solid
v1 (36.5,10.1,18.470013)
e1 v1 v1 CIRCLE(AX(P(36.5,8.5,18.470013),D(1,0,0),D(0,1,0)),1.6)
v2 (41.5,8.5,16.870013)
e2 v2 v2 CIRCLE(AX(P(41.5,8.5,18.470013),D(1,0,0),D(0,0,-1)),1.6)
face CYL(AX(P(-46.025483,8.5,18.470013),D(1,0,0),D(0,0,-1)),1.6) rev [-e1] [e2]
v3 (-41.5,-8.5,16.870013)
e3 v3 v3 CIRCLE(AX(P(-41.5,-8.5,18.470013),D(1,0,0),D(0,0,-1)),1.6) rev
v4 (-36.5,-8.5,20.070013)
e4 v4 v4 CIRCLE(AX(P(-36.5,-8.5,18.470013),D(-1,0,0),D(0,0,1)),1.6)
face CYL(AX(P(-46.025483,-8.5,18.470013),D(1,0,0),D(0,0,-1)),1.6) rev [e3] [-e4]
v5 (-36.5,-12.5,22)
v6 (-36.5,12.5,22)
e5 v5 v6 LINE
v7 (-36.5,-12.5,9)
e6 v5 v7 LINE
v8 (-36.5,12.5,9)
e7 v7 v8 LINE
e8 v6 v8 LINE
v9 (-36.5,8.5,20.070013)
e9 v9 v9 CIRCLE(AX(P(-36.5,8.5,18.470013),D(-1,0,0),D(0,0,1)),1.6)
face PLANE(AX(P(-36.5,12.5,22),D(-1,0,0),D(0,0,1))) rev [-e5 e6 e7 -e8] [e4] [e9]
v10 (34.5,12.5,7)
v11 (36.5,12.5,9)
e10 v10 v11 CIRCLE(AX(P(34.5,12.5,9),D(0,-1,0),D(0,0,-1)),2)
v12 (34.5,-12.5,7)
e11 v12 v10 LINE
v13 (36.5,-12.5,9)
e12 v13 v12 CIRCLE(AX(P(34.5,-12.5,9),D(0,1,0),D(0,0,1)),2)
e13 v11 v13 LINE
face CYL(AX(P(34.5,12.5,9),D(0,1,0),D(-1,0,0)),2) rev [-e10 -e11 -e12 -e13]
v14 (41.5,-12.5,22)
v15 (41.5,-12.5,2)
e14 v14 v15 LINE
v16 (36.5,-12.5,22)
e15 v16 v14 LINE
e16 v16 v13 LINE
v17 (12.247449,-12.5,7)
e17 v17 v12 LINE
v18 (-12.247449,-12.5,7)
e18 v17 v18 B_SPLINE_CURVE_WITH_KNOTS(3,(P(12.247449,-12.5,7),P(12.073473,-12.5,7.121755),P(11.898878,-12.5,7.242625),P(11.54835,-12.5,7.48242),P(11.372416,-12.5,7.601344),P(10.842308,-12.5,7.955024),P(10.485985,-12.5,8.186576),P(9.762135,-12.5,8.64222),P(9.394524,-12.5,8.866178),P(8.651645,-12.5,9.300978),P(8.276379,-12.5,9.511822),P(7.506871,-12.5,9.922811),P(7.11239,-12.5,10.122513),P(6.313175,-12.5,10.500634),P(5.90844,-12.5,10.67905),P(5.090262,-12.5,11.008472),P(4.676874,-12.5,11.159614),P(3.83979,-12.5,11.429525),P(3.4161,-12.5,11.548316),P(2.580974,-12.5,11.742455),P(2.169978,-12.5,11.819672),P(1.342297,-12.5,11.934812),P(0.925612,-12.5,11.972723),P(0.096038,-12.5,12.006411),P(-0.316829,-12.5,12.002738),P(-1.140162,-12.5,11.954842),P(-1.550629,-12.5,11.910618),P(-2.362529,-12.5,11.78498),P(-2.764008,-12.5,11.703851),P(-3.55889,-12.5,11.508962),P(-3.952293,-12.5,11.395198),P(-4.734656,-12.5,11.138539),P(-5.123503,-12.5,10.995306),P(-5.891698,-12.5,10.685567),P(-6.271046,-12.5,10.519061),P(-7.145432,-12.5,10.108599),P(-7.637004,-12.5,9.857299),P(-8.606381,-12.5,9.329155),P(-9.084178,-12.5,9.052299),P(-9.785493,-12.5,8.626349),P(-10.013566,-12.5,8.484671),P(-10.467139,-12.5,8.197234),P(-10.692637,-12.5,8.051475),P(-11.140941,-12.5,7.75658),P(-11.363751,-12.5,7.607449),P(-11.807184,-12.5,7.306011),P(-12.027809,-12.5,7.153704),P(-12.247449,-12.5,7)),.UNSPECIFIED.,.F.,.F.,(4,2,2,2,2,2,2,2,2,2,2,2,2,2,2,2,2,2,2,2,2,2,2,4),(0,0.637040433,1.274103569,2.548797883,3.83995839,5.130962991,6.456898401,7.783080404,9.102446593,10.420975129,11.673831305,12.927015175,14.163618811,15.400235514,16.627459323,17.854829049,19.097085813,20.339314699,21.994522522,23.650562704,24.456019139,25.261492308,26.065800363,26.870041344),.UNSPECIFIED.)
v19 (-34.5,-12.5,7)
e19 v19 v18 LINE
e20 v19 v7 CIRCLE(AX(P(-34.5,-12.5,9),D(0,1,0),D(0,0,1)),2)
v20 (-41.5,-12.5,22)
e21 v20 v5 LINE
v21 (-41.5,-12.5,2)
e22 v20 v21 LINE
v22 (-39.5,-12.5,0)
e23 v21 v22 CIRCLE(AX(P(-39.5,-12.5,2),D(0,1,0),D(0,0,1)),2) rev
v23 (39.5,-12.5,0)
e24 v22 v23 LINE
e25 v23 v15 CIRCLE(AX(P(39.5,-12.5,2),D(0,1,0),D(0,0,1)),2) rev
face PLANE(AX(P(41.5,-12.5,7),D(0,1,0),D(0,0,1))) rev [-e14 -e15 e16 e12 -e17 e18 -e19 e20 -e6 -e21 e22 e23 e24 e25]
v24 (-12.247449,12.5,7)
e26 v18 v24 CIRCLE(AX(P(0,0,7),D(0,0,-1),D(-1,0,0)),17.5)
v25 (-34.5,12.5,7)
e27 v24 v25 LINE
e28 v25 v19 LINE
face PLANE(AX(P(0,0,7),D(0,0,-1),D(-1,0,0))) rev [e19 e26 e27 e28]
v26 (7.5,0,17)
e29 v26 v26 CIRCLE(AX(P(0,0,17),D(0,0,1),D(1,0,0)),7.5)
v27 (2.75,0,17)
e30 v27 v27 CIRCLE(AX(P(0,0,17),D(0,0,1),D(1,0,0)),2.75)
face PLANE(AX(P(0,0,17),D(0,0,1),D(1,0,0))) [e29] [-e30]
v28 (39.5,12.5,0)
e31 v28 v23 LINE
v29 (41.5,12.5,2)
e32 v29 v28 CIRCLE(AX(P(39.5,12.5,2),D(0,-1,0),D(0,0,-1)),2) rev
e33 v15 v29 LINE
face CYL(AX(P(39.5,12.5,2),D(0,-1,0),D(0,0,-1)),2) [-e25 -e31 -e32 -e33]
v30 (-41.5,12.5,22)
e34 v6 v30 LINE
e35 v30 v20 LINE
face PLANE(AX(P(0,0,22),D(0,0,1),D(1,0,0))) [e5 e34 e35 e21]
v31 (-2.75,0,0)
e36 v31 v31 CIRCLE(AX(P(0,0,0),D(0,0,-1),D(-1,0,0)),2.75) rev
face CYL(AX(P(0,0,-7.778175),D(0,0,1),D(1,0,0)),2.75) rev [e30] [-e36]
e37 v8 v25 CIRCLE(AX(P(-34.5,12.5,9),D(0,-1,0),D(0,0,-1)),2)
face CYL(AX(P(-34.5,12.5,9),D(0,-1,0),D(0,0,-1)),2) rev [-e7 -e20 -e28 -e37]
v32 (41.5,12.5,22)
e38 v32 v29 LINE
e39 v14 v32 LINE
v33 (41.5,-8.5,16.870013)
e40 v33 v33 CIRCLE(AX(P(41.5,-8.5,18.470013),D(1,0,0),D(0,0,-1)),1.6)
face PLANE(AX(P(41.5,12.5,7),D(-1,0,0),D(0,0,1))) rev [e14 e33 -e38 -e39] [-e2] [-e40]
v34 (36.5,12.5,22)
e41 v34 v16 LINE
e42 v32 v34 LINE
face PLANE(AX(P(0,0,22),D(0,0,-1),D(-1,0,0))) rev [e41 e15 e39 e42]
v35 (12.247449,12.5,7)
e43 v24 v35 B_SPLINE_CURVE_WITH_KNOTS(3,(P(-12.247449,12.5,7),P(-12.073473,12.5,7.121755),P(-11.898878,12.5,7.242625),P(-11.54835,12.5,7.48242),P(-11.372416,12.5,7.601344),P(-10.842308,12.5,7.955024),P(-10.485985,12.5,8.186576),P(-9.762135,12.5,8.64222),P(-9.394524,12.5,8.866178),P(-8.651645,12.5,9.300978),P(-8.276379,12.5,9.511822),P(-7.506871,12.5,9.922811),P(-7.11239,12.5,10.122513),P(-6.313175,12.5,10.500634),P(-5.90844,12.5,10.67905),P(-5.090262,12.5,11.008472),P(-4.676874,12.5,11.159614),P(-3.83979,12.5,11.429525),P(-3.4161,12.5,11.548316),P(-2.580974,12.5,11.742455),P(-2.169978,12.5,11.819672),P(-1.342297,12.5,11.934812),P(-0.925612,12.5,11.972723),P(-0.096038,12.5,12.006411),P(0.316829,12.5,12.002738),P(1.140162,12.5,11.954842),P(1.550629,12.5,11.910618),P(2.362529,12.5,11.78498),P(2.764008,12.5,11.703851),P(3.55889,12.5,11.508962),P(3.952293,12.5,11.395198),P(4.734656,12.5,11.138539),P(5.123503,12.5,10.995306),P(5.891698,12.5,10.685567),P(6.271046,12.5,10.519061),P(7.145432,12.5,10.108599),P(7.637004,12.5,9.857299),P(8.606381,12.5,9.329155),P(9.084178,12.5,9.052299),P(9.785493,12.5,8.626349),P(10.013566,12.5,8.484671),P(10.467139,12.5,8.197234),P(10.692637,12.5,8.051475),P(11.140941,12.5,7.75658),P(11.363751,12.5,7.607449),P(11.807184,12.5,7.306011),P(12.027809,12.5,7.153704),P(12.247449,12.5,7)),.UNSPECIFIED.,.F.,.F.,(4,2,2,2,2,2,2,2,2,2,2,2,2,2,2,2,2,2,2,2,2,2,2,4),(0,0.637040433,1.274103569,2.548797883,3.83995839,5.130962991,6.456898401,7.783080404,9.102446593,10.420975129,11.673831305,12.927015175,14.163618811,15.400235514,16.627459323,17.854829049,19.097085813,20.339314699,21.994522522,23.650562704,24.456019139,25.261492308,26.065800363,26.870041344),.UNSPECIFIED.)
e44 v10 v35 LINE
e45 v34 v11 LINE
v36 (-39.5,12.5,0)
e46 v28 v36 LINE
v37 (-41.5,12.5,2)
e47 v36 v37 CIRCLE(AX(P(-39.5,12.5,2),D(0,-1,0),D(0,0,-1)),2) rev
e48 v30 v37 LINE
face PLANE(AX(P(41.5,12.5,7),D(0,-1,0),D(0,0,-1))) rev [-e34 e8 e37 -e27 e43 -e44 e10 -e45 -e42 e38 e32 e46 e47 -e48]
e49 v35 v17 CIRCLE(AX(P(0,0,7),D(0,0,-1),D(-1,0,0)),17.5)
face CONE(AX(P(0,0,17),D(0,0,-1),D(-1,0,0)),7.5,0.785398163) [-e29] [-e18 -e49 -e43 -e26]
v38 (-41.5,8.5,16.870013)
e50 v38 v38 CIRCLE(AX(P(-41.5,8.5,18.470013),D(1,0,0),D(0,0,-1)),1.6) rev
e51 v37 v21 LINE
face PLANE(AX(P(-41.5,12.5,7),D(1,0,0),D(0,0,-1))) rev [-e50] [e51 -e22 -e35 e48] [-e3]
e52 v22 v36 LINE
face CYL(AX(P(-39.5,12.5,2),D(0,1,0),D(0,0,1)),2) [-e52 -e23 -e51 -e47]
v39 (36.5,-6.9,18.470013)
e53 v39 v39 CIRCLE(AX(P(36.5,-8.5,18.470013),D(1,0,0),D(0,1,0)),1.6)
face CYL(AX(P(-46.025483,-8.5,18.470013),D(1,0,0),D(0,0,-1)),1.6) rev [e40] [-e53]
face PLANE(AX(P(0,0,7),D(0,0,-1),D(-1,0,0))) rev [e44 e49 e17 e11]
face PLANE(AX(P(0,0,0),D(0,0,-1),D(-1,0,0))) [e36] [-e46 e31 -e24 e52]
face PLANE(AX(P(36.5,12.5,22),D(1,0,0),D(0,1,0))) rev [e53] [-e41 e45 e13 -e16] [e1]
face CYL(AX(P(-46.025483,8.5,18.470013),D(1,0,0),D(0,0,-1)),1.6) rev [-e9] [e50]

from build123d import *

# Parameters (mm, degrees)
SZKIC1_W                    = 83
SZKIC1_H                    = 25
DODANIE_WYCI_GNI_CIE1_DEPTH = 7
SZKIC2_W                    = 5
SZKIC2_H                    = 25
DODANIE_WYCI_GNI_CIE2_DEPTH = 15
WYTNIJ_WYCI_GNI_CIE1_REACH  = 88.771
SZKIC3_R                    = 1.6
SZKIC4_R                    = 7.5
DODANIE_WYCI_GNI_CIE4_DEPTH = 10
SZKIC5_R                    = 2.75
WYTNIJ_WYCI_GNI_CIE2_DEPTH  = 17
SFAZOWANIE1_SIZE            = 10
ZAOKR_GLENIE1_R             = 2
ZAOKR_GLENIE2_R             = 2


with BuildPart() as part:
    # Szkic1 → Dodanie-wyciągnięcie1 (new body)
    with BuildSketch(Plane.XY):
        Rectangle(SZKIC1_W, SZKIC1_H)
    extrude(amount=DODANIE_WYCI_GNI_CIE1_DEPTH)

    # Szkic2 → Dodanie-wyciągnięcie2 (add)
    with BuildSketch(Plane.XY.offset(7)):
        with Locations((-39, 0)):
            Rectangle(SZKIC2_W, SZKIC2_H)
        with Locations((39, 0)):
            Rectangle(SZKIC2_W, SZKIC2_H)
    extrude(amount=DODANIE_WYCI_GNI_CIE2_DEPTH)

    # Wytnij-wyciągnięcie1: up to this face of the body (flat: up to its plane)
    wytnij_wyci_gni_cie1_end = Plane(part.part.faces().sort_by_distance((-41.5, 0, 11))[0])
    # Szkic3 → Wytnij-wyciągnięcie1 (cut, up to the picked face)
    with BuildSketch(Plane(origin=(41.5, 0, 0), x_dir=(0, 0, -1), z_dir=(1, 0, 0)), mode=Mode.PRIVATE) as wytnij_wyci_gni_cie1_sk1:
        with Locations((-18.470012568, 8.5)):
            Circle(SZKIC3_R)
    wytnij_wyci_gni_cie1_tool1 = split(extrude(wytnij_wyci_gni_cie1_sk1.sketch, amount=-WYTNIJ_WYCI_GNI_CIE1_REACH, mode=Mode.PRIVATE), bisect_by=wytnij_wyci_gni_cie1_end, keep=Keep.BOTH, mode=Mode.PRIVATE)
    # Szkic3 → Wytnij-wyciągnięcie1 (cut, up to the picked face)
    with BuildSketch(Plane(origin=(41.5, 0, 0), x_dir=(0, 0, -1), z_dir=(1, 0, 0)), mode=Mode.PRIVATE) as wytnij_wyci_gni_cie1_sk2:
        with Locations((-18.470012568, -8.5)):
            Circle(SZKIC3_R)
    wytnij_wyci_gni_cie1_tool2 = split(extrude(wytnij_wyci_gni_cie1_sk2.sketch, amount=-WYTNIJ_WYCI_GNI_CIE1_REACH, mode=Mode.PRIVATE), bisect_by=wytnij_wyci_gni_cie1_end, keep=Keep.BOTH, mode=Mode.PRIVATE)
    add(wytnij_wyci_gni_cie1_tool1.solids().sort_by(Axis((41.5, 8.5, 18.470013), (-1, 0, 0)))[0], mode=Mode.SUBTRACT)
    add(wytnij_wyci_gni_cie1_tool2.solids().sort_by(Axis((41.5, -8.5, 18.470013), (-1, 0, 0)))[0], mode=Mode.SUBTRACT)

    # Szkic4 → Dodanie-wyciągnięcie4 (add)
    with BuildSketch(Plane.XY.offset(7)):
        with Locations(Location((0, 0, 0), (0, 0, 180))):
            Circle(SZKIC4_R)
    extrude(amount=DODANIE_WYCI_GNI_CIE4_DEPTH)

    # Szkic5 → Wytnij-wyciągnięcie2 (cut)
    with BuildSketch(Plane.XY.offset(17)):
        Circle(SZKIC5_R)
    extrude(amount=-WYTNIJ_WYCI_GNI_CIE2_DEPTH, mode=Mode.SUBTRACT)

    # Sfazowanie1
    # the kernel refuses this chamfer: 10 mm, written as the material it adds along each edge
    with BuildSketch(Plane(origin=(0, 0, 7), x_dir=(-1, 0, 0), z_dir=(0, 1, 0))) as sfazowanie1_piece_1_section:
        Polygon((7.5 + SFAZOWANIE1_SIZE, 0), (7.5, SFAZOWANIE1_SIZE), (7.5, 0), align=None)
    sfazowanie1_piece_1 = revolve(axis=Axis((0, 0, 7), (0, 0, 1)), mode=Mode.PRIVATE)
    sfazowanie1_piece_1 = split(sfazowanie1_piece_1, bisect_by=Plane(origin=(12.53571583, 12.5, 11.752873117), z_dir=(0, -1, 0)), keep=Keep.TOP, mode=Mode.PRIVATE)
    sfazowanie1_piece_1 = split(sfazowanie1_piece_1, bisect_by=Plane(origin=(12.53571583, -12.5, 11.752873117), z_dir=(0, 1, 0)), keep=Keep.TOP, mode=Mode.PRIVATE)
    sfazowanie1_piece_1 = split(sfazowanie1_piece_1, bisect_by=Plane(origin=(12.53571583, 0, 17), z_dir=(0, 0, -1)), keep=Keep.TOP, mode=Mode.PRIVATE)
    add(sfazowanie1_piece_1)

    # Zaokrąglenie1
    zaokr_glenie1_edges = [part.edges().sort_by_distance(p)[0] for p in [
        (-36.5, 0, 7),
        (36.5, 0, 7),
    ]]
    fillet(zaokr_glenie1_edges, radius=ZAOKR_GLENIE1_R)

    # Zaokrąglenie2
    zaokr_glenie2_edges = [part.edges().sort_by_distance(p)[0] for p in [
        (41.5, 0, 0),
        (-41.5, 0, 0),
    ]]
    fillet(zaokr_glenie2_edges, radius=ZAOKR_GLENIE2_R)


solid = part.part
